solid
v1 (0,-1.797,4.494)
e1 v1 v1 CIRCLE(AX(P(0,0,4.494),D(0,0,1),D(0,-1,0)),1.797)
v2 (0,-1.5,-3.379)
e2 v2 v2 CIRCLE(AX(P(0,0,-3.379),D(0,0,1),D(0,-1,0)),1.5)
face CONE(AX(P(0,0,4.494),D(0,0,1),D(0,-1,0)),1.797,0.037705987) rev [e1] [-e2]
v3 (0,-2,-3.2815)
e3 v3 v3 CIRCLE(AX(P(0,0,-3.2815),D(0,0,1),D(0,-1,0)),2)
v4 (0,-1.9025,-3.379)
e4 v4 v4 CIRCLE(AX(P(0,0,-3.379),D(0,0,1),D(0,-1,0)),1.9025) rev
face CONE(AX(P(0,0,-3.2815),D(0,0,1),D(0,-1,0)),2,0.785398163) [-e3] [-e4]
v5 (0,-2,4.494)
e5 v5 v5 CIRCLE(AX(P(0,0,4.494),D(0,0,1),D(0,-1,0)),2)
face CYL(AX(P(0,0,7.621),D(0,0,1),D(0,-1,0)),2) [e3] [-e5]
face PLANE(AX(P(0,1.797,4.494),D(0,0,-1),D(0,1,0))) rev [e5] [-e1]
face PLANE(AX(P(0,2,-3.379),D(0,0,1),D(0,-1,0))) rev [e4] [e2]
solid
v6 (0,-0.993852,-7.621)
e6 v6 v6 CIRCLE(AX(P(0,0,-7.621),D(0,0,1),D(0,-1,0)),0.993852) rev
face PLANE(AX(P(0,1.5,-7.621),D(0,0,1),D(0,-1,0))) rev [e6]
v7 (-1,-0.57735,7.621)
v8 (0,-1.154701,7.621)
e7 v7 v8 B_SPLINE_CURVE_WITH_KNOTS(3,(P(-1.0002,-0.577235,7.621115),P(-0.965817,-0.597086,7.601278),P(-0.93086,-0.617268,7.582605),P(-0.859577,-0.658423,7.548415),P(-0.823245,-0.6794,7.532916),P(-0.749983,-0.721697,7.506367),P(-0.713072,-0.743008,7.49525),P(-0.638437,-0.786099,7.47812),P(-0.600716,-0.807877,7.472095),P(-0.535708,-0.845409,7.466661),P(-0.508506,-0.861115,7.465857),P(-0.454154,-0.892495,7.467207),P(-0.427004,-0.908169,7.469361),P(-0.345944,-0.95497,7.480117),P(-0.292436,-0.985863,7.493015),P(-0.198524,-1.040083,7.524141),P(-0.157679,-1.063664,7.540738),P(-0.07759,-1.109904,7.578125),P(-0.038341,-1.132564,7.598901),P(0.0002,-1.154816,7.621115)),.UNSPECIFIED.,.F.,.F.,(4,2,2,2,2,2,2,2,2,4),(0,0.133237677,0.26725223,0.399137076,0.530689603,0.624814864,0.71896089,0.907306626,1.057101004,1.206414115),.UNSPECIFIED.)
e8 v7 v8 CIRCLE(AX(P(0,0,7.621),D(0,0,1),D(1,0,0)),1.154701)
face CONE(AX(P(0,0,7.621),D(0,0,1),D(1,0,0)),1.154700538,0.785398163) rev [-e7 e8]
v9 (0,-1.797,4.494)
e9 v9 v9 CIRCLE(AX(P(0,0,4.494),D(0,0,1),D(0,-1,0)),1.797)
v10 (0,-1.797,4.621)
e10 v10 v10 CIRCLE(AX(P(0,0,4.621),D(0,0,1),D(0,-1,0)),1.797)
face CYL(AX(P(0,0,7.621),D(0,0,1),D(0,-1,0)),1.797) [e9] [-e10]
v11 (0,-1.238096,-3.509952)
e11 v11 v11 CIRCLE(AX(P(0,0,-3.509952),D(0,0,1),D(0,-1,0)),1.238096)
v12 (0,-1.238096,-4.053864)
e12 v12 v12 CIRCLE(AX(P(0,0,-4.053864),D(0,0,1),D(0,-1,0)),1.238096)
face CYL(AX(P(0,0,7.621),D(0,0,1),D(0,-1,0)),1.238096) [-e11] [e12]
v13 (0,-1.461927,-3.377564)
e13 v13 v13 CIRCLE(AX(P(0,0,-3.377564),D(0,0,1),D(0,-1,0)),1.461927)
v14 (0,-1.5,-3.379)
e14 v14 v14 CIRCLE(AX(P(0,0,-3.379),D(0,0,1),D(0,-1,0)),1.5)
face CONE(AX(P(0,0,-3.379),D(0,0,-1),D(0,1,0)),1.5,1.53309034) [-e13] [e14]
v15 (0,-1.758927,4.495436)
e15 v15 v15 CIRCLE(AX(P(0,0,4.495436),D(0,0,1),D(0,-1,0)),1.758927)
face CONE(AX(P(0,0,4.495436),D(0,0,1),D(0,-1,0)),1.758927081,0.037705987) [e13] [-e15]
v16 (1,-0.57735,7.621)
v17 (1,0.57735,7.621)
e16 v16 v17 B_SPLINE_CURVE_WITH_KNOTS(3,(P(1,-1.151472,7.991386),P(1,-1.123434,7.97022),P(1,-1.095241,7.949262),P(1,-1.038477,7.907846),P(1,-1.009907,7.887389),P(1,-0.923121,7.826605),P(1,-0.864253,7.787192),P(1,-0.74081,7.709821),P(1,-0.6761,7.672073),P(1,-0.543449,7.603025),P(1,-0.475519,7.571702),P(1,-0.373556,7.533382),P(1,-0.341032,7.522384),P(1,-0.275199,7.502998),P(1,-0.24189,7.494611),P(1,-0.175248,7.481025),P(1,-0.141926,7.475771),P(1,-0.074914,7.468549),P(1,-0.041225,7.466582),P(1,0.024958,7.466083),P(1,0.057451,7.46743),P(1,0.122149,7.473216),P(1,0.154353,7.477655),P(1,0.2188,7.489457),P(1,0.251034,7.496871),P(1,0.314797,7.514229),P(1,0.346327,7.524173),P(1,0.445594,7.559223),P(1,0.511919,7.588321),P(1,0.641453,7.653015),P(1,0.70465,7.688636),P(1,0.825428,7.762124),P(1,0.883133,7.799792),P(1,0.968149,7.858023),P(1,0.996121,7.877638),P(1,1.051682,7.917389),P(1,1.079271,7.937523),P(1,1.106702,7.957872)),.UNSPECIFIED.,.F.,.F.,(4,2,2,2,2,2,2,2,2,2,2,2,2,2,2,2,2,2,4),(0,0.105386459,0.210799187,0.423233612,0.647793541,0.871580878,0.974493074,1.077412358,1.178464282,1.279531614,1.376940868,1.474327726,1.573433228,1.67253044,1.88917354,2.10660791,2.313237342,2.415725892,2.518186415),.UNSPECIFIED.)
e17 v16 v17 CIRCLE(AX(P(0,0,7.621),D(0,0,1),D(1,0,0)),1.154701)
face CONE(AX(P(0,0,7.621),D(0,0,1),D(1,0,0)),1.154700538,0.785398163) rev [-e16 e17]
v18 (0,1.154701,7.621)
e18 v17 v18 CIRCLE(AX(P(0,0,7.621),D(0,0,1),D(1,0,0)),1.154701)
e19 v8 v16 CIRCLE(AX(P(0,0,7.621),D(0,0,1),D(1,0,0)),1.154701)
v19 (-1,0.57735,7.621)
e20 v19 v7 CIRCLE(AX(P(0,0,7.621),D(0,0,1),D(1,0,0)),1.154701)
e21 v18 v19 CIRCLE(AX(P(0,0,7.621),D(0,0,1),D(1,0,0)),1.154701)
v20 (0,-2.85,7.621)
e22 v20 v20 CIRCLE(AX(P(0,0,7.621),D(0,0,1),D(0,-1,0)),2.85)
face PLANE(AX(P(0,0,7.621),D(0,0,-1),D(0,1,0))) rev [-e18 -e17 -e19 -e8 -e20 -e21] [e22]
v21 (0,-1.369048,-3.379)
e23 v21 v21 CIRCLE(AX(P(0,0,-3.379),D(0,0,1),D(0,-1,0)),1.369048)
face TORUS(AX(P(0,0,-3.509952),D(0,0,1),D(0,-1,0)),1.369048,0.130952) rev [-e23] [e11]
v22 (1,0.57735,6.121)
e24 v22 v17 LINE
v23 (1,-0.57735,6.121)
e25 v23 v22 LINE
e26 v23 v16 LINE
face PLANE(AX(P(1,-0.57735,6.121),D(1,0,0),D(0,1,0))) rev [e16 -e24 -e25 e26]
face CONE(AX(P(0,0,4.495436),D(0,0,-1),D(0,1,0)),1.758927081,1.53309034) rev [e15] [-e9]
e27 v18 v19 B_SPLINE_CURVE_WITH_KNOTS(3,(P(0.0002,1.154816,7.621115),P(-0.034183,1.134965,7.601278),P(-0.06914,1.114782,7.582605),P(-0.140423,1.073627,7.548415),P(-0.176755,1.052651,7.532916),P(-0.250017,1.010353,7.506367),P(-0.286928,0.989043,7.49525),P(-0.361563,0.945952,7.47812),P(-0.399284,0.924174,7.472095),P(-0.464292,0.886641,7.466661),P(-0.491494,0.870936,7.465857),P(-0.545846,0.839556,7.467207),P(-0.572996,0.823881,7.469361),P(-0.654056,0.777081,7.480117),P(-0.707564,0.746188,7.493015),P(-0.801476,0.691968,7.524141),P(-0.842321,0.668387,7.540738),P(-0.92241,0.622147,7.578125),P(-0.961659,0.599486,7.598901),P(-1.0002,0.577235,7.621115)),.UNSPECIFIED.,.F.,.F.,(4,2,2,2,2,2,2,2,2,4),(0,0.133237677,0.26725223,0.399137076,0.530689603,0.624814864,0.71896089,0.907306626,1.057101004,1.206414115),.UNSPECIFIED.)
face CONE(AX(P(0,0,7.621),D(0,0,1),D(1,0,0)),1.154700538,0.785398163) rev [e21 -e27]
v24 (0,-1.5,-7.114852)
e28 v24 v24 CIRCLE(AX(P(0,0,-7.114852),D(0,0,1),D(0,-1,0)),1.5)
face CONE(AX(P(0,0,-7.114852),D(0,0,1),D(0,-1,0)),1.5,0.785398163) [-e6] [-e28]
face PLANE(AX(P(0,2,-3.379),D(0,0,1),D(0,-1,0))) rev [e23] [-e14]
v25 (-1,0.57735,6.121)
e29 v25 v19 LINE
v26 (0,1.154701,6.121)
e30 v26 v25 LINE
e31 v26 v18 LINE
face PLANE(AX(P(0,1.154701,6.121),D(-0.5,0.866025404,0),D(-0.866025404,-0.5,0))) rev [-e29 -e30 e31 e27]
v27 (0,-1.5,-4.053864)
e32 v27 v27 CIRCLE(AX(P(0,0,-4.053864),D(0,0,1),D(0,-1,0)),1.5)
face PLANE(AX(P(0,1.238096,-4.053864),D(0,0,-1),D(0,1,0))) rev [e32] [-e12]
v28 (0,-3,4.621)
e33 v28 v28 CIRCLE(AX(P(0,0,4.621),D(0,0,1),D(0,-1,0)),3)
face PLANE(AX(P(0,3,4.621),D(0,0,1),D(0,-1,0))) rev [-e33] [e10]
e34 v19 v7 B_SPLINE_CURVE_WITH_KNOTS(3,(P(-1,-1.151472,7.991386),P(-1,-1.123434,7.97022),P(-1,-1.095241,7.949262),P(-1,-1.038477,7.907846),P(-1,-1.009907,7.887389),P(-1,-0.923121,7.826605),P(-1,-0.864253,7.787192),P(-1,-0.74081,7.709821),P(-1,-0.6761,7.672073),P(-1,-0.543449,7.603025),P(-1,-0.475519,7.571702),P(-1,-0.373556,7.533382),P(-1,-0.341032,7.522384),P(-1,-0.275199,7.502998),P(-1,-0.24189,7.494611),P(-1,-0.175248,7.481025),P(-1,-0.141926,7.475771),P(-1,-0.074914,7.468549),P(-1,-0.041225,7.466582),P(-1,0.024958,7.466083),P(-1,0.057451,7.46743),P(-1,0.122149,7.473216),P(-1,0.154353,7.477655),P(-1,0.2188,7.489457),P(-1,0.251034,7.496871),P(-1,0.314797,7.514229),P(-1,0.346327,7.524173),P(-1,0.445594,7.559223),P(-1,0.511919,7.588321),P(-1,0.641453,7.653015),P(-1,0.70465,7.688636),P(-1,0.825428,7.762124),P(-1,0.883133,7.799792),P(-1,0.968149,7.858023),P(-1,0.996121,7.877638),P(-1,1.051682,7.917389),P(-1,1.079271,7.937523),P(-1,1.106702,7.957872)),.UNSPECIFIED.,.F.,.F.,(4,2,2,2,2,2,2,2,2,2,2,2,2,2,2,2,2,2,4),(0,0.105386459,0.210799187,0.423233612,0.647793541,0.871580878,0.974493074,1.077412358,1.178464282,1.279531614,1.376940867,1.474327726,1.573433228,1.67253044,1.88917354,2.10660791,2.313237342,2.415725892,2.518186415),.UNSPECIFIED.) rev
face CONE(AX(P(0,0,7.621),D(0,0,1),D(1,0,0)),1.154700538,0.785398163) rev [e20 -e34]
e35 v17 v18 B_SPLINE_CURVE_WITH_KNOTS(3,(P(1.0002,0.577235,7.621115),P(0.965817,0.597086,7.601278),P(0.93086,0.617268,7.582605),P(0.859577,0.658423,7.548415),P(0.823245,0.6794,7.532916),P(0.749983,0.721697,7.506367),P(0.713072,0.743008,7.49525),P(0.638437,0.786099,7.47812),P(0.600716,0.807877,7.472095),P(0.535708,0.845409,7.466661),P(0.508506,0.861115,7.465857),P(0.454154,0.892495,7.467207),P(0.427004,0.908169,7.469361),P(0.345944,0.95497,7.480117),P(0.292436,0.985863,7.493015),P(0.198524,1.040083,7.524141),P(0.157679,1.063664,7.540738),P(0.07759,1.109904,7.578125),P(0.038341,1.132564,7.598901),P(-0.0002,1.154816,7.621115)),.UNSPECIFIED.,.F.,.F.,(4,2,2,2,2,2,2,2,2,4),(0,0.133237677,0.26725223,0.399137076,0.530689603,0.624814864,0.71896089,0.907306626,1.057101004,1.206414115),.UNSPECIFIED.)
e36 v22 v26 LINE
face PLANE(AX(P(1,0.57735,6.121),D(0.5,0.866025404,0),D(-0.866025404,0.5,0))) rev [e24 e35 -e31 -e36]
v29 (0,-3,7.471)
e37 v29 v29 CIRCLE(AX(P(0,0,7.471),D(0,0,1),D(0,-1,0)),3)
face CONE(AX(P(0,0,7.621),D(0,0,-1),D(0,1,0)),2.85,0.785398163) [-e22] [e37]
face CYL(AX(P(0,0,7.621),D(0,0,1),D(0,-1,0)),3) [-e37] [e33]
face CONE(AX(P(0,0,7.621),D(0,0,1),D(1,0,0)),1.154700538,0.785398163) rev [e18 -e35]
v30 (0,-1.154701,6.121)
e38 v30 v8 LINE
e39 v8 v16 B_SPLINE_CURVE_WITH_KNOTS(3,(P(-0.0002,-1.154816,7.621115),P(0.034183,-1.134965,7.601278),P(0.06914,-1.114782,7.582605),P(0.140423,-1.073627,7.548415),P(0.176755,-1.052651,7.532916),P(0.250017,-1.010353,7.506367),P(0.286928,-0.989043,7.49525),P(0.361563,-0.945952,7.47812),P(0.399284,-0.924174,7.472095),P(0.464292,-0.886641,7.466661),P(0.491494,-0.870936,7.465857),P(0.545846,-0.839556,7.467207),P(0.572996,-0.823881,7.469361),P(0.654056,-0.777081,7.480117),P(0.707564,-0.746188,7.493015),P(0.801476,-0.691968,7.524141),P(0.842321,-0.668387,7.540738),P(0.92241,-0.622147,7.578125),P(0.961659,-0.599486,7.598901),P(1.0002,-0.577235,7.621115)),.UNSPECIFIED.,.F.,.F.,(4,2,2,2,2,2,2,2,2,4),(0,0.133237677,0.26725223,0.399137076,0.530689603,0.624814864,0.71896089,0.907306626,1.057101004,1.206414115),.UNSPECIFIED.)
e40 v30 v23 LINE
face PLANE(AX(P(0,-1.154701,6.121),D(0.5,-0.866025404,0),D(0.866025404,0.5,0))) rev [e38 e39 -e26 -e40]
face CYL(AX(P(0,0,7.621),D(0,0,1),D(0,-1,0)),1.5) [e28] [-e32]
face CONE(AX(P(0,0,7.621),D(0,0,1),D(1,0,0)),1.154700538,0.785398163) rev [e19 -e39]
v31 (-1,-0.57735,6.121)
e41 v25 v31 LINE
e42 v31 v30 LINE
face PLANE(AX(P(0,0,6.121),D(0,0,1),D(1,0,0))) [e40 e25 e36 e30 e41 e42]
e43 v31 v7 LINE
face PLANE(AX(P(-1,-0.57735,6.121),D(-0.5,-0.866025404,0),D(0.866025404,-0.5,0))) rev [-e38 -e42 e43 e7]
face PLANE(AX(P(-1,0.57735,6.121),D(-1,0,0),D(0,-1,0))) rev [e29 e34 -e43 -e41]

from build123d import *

# Parameters (mm, degrees)
CUT_EXTRUDE1_START = 7.621
CUT_EXTRUDE1_DEPTH = 1.5
CHAMFER1_SIZE      = 0.0975
CHAMFER2_SIZE      = 0.506148016


# Read off the part's stored shape, not the designer's step: Cut-Revolve-Thin1
with BuildPart() as part:
    # Sketch3 → Revolve1 (revolve)
    with BuildSketch(Plane(origin=(0, 0, 0), x_dir=(0, 0, -1), z_dir=(1, 0, 0)), mode=Mode.PRIVATE) as revolve1_sk:
        with BuildLine():
            Line((-7.621, 0), (-7.621, 2.805))
            Line((-7.621, 2.805), (-7.621, 3))
            Line((-7.621, 3), (-4.816, 3))
            Line((-4.816, 3), (-4.621, 3))
            Line((-4.621, 3), (-4.621, 1.797))
            Line((-4.621, 1.797), (-4.494, 1.797))
            Line((-4.494, 1.797), (-4.494, 2))
            Line((-4.494, 2), (3.379, 2))
            Line((3.379, 2), (3.379, 1.36904775))
            ThreePointArc((3.379, 1.36904775), (3.417355026, 1.276450526), (3.50995225, 1.2380955))
            Line((3.50995225, 1.2380955), (4.053864022, 1.2380955))
            Line((4.053864022, 1.2380955), (4.053864022, 1.5))
            Line((4.053864022, 1.5), (7.246, 1.5))
            Line((7.246, 1.5), (7.621, 1.5))
            Line((7.621, 1.5), (7.621, 0))
            Line((7.621, 0), (-7.621, 0))
        make_face()
    revolve(revolve1_sk.sketch.rotate(Axis((0, 0, 7.621), (0, 0, -1)), 180), axis=Axis((0, 0, 7.621), (0, 0, -1)))

    # Cut-Revolve-Thin1 outline → Cut-Revolve-Thin1 (revolve, cut)
    with BuildSketch(Plane.XZ):
        Polygon((1.758927081, 4.495436258), (1.461927081, -3.377563742), (1.5, -3.379), (1.797, 4.494), align=None)
    revolve(axis=Axis((0, 0, 0), (0, 0, 1)), mode=Mode.SUBTRACT)

    # Sketch4 → Cut-Extrude1 (cut)
    with BuildSketch(Plane.XY.offset(CUT_EXTRUDE1_START)):
        Polygon((0, 1.154700538), (-1, 0.577350269), (-1, -0.577350269), (0, -1.154700538), (1, -0.577350269), (1, 0.577350269), align=None)
    extrude(amount=-CUT_EXTRUDE1_DEPTH, mode=Mode.SUBTRACT)

    # Cut-Extrude2 cone 1 section (through the dimple's axis) → Cut-Extrude2 (revolve, cut)
    with BuildSketch(Plane(origin=(0, 0, 7.621), x_dir=(0, -1, 0), z_dir=(1, 0, 0))):
        Polygon((0, 0), (1.154700538, 0), (0, 1.154700538), align=None)
    revolve(axis=Axis((0, 0, 7.621), (0, 0, -1)), mode=Mode.SUBTRACT)

    # Chamfer1
    chamfer1_edges = [part.edges().sort_by_distance(p)[0] for p in [
        (0, 2, -3.379),
    ]]
    chamfer(chamfer1_edges, length=CHAMFER1_SIZE)

    # Chamfer2
    chamfer2_edges = [part.edges().sort_by_distance(p)[0] for p in [
        (0, 1.5, -7.621),
    ]]
    chamfer(chamfer2_edges, length=CHAMFER2_SIZE)

    # Sketch10 → Cut-Revolve2 (revolve, cut)
    with BuildSketch(Plane(origin=(0, 0, 0), x_dir=(0, 0, -1), z_dir=(1, 0, 0)), mode=Mode.PRIVATE) as cut_revolve2_sk:
        Polygon((-7.621, 2.85), (-7.471, 3), (-7.621, 3), align=None)
    revolve(cut_revolve2_sk.sketch.rotate(Axis((0, 0, 7.621), (0, 0, -1)), 180), axis=Axis((0, 0, 7.621), (0, 0, -1)), mode=Mode.SUBTRACT)


solid = part.part
